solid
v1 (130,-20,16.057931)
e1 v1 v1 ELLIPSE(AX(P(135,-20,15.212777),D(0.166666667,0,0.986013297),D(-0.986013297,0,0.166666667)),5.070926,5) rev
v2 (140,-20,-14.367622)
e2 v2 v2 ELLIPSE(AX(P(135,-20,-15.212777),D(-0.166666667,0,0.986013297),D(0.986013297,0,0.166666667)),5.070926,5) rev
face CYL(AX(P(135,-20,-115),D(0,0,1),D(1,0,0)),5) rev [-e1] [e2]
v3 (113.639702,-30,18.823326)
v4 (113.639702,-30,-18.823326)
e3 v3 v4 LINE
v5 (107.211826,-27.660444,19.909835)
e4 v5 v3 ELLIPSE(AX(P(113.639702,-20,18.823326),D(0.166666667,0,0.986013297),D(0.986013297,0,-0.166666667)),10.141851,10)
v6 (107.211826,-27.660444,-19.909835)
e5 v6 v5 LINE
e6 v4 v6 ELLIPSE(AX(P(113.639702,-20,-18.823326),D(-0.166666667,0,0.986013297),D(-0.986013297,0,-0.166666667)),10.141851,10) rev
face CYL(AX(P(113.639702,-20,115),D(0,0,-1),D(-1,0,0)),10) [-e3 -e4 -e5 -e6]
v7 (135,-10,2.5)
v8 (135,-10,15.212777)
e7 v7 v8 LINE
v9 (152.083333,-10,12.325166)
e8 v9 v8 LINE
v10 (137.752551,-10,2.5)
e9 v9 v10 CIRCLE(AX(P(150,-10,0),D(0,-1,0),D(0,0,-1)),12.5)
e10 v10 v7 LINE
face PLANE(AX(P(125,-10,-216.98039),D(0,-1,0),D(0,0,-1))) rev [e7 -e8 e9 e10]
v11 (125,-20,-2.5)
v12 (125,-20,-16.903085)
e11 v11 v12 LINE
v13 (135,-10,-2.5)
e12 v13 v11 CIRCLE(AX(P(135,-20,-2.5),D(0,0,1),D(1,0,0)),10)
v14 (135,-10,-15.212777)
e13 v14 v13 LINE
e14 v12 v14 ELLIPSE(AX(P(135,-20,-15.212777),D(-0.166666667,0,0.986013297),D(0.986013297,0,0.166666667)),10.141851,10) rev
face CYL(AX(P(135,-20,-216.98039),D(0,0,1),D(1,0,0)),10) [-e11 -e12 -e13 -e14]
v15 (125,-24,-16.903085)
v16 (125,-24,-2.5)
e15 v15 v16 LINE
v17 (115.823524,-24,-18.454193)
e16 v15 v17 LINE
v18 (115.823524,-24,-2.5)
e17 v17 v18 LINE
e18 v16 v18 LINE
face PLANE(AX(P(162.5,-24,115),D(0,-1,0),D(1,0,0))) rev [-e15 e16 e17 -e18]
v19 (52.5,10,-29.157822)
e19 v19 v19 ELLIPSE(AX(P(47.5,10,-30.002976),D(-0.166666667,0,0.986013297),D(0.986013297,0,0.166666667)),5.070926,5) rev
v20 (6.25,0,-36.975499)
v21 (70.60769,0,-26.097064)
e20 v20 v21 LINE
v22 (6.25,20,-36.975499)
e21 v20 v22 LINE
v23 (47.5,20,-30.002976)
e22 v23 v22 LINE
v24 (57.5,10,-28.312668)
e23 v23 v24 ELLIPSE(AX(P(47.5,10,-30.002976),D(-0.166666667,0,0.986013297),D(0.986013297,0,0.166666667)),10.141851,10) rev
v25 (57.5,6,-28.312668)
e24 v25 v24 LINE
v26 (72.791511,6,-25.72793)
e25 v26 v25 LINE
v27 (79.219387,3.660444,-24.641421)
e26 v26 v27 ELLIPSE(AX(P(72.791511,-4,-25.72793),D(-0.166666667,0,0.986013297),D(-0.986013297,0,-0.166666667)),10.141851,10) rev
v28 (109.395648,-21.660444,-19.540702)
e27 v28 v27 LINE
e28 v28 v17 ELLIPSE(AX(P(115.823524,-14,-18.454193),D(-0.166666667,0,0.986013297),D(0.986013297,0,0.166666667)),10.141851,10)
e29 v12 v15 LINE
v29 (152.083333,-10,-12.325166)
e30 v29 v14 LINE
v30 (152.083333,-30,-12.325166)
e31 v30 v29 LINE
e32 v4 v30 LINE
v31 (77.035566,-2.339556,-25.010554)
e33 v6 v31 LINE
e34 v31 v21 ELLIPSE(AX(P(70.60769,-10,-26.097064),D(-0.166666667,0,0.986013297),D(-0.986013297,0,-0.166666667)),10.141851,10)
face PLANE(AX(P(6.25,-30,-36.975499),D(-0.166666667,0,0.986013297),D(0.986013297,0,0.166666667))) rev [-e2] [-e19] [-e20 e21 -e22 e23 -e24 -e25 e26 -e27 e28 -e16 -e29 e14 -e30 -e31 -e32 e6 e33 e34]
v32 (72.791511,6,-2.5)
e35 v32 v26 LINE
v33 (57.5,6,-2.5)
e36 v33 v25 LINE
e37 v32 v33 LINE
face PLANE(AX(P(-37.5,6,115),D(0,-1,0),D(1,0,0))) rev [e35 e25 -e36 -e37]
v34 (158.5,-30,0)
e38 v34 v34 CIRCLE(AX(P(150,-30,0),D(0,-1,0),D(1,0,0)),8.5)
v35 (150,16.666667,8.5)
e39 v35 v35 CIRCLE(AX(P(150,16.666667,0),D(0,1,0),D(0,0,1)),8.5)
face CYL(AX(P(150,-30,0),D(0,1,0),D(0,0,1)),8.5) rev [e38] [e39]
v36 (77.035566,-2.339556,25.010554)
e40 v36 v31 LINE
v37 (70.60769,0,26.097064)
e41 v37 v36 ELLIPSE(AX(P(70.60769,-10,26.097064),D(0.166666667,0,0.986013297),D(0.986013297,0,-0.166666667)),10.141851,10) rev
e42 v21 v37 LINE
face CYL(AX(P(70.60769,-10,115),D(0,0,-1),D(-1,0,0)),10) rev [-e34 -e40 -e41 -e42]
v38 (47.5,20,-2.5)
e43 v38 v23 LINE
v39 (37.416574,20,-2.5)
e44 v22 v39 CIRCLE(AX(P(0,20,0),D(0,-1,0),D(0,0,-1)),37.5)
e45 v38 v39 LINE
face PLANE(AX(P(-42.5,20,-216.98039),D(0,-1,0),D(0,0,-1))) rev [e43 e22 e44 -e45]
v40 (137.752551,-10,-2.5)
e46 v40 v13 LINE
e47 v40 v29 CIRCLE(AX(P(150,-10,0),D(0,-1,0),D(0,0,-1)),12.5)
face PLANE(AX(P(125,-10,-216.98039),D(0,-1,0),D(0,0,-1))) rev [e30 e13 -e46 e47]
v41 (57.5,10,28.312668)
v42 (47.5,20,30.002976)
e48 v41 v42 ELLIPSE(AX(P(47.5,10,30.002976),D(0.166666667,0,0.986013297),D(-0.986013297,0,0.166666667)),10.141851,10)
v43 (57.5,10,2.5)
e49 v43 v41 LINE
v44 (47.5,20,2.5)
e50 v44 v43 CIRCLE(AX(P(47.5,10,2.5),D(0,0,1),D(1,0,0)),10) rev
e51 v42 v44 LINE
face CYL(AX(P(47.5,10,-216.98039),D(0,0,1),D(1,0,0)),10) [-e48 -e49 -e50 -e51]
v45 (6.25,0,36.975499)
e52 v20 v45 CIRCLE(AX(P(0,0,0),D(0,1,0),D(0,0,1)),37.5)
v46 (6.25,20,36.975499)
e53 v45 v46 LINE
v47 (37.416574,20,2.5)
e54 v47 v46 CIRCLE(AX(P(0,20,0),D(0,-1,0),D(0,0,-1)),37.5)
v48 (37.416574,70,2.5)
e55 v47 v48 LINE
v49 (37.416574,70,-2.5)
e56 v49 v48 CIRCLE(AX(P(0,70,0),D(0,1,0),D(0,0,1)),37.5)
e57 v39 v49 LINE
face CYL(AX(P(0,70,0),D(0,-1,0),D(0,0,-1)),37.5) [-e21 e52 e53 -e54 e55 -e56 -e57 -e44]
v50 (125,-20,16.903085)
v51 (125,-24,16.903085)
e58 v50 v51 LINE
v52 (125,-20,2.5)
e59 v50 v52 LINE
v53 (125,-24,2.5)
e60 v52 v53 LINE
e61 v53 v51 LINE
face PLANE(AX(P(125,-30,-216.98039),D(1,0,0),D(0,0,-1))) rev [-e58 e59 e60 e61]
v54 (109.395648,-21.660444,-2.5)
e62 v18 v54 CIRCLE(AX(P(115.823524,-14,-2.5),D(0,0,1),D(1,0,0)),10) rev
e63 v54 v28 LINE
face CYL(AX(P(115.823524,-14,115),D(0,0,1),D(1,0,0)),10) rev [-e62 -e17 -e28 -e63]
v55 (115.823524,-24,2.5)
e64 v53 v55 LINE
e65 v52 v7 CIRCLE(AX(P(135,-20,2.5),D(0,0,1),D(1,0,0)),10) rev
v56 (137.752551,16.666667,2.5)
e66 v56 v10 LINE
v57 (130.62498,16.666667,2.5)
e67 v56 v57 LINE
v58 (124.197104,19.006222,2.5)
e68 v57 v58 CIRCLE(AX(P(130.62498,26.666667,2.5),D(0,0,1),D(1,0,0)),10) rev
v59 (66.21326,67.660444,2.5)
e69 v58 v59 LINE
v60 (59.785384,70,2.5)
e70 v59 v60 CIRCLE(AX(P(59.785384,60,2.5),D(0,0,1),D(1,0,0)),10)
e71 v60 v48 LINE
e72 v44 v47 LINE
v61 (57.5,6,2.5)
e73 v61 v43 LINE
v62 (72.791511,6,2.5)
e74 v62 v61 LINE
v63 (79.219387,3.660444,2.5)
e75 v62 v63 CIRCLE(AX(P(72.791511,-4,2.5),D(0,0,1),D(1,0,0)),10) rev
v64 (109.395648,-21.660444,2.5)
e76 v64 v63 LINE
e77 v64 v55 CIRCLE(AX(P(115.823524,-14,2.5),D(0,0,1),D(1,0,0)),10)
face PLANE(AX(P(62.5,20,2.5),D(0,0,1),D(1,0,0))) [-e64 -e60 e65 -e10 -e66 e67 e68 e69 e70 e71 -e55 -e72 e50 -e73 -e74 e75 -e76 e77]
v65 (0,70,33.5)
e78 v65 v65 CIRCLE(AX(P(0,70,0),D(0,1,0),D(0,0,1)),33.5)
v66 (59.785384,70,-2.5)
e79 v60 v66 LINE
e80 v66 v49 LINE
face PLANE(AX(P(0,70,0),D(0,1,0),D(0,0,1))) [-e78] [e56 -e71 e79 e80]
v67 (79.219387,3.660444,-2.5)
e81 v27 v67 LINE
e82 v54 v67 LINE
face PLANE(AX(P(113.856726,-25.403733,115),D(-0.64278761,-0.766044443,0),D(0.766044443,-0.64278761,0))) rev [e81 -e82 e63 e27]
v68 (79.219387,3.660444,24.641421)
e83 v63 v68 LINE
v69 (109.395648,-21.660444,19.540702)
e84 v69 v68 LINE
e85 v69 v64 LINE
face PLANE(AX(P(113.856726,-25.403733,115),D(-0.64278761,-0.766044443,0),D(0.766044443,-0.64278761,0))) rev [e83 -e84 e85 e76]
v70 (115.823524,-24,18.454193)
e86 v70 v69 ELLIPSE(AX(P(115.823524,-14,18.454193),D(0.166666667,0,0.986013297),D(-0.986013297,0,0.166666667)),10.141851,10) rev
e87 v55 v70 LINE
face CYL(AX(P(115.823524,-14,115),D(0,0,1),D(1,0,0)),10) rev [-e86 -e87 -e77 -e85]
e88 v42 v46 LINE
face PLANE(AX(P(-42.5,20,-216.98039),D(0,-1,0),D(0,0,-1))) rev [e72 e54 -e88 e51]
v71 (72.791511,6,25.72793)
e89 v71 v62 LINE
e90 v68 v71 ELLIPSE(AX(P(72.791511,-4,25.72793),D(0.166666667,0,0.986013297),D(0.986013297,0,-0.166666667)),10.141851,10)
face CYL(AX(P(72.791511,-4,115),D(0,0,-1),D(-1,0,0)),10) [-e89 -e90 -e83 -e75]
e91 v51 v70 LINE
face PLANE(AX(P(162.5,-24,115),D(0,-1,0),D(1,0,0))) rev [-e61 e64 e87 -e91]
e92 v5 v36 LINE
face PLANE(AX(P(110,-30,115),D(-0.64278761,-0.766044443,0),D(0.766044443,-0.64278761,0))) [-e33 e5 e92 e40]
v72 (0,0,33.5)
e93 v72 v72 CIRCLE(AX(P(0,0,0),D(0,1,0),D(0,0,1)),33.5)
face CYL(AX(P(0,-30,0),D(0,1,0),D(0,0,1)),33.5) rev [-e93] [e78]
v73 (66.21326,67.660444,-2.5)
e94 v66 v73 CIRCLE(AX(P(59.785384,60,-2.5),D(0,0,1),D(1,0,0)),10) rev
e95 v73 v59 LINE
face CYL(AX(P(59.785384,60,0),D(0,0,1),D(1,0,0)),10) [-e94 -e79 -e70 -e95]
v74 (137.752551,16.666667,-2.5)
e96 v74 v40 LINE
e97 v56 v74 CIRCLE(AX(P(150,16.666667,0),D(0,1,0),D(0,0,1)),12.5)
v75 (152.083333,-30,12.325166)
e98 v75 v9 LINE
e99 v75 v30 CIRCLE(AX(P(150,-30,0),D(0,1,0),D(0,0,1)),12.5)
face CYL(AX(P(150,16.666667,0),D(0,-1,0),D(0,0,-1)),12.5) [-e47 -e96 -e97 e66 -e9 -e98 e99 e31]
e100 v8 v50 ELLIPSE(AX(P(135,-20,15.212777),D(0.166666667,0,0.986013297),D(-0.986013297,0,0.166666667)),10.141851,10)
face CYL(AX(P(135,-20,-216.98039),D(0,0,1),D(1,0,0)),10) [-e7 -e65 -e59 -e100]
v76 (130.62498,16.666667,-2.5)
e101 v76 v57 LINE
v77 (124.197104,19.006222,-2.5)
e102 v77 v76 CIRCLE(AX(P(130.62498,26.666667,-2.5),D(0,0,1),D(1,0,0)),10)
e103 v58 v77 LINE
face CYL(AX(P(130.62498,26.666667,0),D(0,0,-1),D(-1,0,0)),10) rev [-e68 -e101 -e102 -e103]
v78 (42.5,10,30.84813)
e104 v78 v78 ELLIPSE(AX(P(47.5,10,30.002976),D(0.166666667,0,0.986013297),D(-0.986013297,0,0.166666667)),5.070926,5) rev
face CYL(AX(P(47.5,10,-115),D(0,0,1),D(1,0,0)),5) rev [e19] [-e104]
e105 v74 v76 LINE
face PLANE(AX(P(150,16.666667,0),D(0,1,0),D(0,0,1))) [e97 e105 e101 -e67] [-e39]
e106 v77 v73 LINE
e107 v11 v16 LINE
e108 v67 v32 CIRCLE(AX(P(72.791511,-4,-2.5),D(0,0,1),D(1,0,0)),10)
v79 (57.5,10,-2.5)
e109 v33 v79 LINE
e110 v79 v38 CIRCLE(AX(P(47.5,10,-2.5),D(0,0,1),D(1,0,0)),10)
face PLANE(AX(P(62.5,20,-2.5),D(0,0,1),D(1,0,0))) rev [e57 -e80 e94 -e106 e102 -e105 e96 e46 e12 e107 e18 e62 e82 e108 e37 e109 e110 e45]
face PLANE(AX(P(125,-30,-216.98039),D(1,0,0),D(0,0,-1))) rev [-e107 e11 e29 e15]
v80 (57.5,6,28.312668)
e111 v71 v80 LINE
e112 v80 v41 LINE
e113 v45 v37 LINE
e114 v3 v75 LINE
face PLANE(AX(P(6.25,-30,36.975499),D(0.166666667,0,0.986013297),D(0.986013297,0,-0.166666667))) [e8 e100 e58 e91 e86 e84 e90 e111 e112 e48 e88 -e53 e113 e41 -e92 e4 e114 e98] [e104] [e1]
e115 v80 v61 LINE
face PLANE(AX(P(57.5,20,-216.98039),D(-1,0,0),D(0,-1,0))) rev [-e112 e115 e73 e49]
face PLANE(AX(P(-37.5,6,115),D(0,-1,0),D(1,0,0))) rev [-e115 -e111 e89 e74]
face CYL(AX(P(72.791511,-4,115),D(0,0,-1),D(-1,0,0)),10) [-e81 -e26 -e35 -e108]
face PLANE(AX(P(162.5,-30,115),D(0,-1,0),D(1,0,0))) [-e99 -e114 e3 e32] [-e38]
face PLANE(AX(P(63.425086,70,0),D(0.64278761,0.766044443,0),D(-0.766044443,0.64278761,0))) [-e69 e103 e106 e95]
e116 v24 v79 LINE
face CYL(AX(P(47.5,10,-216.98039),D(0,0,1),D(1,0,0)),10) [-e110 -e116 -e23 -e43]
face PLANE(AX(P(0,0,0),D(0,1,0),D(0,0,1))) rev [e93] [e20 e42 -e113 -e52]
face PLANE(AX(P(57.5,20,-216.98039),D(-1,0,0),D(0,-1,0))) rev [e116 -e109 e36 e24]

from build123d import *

# Parameters (mm, degrees)
SKETCH2_R                = 37.5
BOSS_EXTRUDE1_DEPTH      = 70
BOSS_EXTRUDE2_START      = -30
SKETCH2_3_R              = 12.5
BOSS_EXTRUDE2_DEPTH      = 46.666666667
EXTRUDE_THIN1_DEPTH      = 115
SKETCH5_W                = 100
SKETCH5_H                = 20
SKETCH5_W_2              = 50
BOSS_EXTRUDE3_DEPTH      = 230
CUT_EXTRUDE2_DEPTH       = 298.363414024
CUT_EXTRUDE2_DEPTH_BACK  = 298.363414024
SKETCH5_3_R              = 5
CUT_EXTRUDE1_START       = -30
CUT_EXTRUDE1_OUTLINE_W   = 217.5
CUT_EXTRUDE1_OUTLINE_H   = 230
CUT_EXTRUDE1_OUTLINE_R   = 8.5
CUT_EXTRUDE1_OUTLINE_R_2 = 33.5
CUT_EXTRUDE1_DEPTH       = 100
RIB1_START               = -2.5
RIB1_DEPTH               = 5
FILLET1_R                = 10


# Read off the part's stored shape, not the designer's step: Cut-Extrude1, Rib1
with BuildPart() as part:
    # Sketch2 → Boss-Extrude1 (new body)
    with BuildSketch(Plane(origin=(0, 0, 0), x_dir=(1, 0, 0), z_dir=(0, 1, 0))):
        with Locations(Location((0, 0, 0), (0, 0, 270))):
            Circle(SKETCH2_R)
    extrude(amount=BOSS_EXTRUDE1_DEPTH)



with BuildPart() as body_2:
    # Sketch2<3> → Boss-Extrude2 (new body)
    with BuildSketch(Plane(origin=(0, 0, 0), x_dir=(1, 0, 0), z_dir=(0, 1, 0)).offset(BOSS_EXTRUDE2_START)):
        with Locations(Location((150, 0, 0), (0, 0, 270))):
            Circle(SKETCH2_3_R)
    extrude(amount=BOSS_EXTRUDE2_DEPTH)


with BuildPart() as part_1:
    add(part.part)

    add(body_2.part)  # Extrude-Thin1 merges body 2
    # Sketch3 → Extrude-Thin1 (add, symmetric)
    with BuildSketch(Plane.XY):
        Polygon((-37.5, 0), (74.247392222, 0), (110, -30), (162.5, -30), (162.5, -24), (112.183821406, -24), (76.431213628, 6), (-37.5, 6), align=None)
    extrude(amount=EXTRUDE_THIN1_DEPTH, both=True)

    # Sketch5 → Boss-Extrude3 (add)
    with BuildSketch(Plane.XY.offset(115)):
        with Locations((7.5, 10)):
            Rectangle(SKETCH5_W, SKETCH5_H)
        with Locations((150, -20)):
            Rectangle(SKETCH5_W_2, SKETCH5_H)
    extrude(amount=-BOSS_EXTRUDE3_DEPTH)

    # Sketch5<3> → Cut-Extrude2 (cut, two sides: drawn at the far end of the back side and taken through both)
    with BuildSketch(Plane.XY.offset(115).offset(-CUT_EXTRUDE2_DEPTH_BACK)):
        with Locations((47.5, 10)):
            Circle(SKETCH5_3_R)
        with Locations((135, -20)):
            Circle(SKETCH5_3_R)
    extrude(amount=CUT_EXTRUDE2_DEPTH + CUT_EXTRUDE2_DEPTH_BACK, mode=Mode.SUBTRACT)

    # Cut-Extrude1 outline → Cut-Extrude1 (cut)
    # profile 1 of 3: a face of its own
    with BuildSketch(Plane(origin=(0, 0, 0), x_dir=(1, 0, 0), z_dir=(0, 1, 0)).offset(CUT_EXTRUDE1_START)):
        with Locations((66.25, 0)):
            Rectangle(CUT_EXTRUDE1_OUTLINE_W, CUT_EXTRUDE1_OUTLINE_H)
        with BuildLine():
            ThreePointArc((152.083333333, 12.325166215), (162.5, 0), (152.083333333, -12.325166215))
            Line((152.083333333, -12.325166215), (6.25, -36.975498644))
            ThreePointArc((6.25, -36.975498644), (-37.5, 0), (6.25, 36.975498644))
            Line((6.25, 36.975498644), (152.083333333, 12.325166215))
        make_face(mode=Mode.SUBTRACT)
    # profile 2 of 3: a face of its own
    with BuildSketch(Plane(origin=(0, 0, 0), x_dir=(1, 0, 0), z_dir=(0, 1, 0)).offset(CUT_EXTRUDE1_START)):
        with Locations((150, 0)):
            Circle(CUT_EXTRUDE1_OUTLINE_R)
    # profile 3 of 3: a face of its own
    with BuildSketch(Plane(origin=(0, 0, 0), x_dir=(1, 0, 0), z_dir=(0, 1, 0)).offset(CUT_EXTRUDE1_START)):
        Circle(CUT_EXTRUDE1_OUTLINE_R_2)
    extrude(amount=CUT_EXTRUDE1_DEPTH, mode=Mode.SUBTRACT)

    # Rib1 outline → Rib1 (add)
    with BuildSketch(Plane.XY.offset(RIB1_START)):
        Polygon((139, -10), (139, 16.666666667), (126.985277599, 16.666666667), (63.425085994, 70), (36, 70), (36, 20), (57.5, 20), (57.5, 6), (76.431213628, 6), (112.183821406, -24), (125, -24), (125, -10), align=None)
    extrude(amount=RIB1_DEPTH)

    # Fillet1
    fillet1_edges = [part_1.edges().sort_by_distance(p)[0] for p in [
        (76.431213628, 6, 13.806354192),
        (112.183821406, -24, 10.784707334),
        (110, -30, 0),
        (112.183821406, -24, -10.784707334),
        (125, -10, 9.701542547),
        (76.431213628, 6, -13.806354192),
        (57.5, 20, 15.406333767),
        (126.985277599, 16.666666667, 0),
        (63.425085994, 70, 0),
        (125, -10, -9.701542547),
        (57.5, 20, -15.406333767),
        (74.247392222, 0, 0),
    ]]
    fillet(fillet1_edges, radius=FILLET1_R)


solid = part_1.part
